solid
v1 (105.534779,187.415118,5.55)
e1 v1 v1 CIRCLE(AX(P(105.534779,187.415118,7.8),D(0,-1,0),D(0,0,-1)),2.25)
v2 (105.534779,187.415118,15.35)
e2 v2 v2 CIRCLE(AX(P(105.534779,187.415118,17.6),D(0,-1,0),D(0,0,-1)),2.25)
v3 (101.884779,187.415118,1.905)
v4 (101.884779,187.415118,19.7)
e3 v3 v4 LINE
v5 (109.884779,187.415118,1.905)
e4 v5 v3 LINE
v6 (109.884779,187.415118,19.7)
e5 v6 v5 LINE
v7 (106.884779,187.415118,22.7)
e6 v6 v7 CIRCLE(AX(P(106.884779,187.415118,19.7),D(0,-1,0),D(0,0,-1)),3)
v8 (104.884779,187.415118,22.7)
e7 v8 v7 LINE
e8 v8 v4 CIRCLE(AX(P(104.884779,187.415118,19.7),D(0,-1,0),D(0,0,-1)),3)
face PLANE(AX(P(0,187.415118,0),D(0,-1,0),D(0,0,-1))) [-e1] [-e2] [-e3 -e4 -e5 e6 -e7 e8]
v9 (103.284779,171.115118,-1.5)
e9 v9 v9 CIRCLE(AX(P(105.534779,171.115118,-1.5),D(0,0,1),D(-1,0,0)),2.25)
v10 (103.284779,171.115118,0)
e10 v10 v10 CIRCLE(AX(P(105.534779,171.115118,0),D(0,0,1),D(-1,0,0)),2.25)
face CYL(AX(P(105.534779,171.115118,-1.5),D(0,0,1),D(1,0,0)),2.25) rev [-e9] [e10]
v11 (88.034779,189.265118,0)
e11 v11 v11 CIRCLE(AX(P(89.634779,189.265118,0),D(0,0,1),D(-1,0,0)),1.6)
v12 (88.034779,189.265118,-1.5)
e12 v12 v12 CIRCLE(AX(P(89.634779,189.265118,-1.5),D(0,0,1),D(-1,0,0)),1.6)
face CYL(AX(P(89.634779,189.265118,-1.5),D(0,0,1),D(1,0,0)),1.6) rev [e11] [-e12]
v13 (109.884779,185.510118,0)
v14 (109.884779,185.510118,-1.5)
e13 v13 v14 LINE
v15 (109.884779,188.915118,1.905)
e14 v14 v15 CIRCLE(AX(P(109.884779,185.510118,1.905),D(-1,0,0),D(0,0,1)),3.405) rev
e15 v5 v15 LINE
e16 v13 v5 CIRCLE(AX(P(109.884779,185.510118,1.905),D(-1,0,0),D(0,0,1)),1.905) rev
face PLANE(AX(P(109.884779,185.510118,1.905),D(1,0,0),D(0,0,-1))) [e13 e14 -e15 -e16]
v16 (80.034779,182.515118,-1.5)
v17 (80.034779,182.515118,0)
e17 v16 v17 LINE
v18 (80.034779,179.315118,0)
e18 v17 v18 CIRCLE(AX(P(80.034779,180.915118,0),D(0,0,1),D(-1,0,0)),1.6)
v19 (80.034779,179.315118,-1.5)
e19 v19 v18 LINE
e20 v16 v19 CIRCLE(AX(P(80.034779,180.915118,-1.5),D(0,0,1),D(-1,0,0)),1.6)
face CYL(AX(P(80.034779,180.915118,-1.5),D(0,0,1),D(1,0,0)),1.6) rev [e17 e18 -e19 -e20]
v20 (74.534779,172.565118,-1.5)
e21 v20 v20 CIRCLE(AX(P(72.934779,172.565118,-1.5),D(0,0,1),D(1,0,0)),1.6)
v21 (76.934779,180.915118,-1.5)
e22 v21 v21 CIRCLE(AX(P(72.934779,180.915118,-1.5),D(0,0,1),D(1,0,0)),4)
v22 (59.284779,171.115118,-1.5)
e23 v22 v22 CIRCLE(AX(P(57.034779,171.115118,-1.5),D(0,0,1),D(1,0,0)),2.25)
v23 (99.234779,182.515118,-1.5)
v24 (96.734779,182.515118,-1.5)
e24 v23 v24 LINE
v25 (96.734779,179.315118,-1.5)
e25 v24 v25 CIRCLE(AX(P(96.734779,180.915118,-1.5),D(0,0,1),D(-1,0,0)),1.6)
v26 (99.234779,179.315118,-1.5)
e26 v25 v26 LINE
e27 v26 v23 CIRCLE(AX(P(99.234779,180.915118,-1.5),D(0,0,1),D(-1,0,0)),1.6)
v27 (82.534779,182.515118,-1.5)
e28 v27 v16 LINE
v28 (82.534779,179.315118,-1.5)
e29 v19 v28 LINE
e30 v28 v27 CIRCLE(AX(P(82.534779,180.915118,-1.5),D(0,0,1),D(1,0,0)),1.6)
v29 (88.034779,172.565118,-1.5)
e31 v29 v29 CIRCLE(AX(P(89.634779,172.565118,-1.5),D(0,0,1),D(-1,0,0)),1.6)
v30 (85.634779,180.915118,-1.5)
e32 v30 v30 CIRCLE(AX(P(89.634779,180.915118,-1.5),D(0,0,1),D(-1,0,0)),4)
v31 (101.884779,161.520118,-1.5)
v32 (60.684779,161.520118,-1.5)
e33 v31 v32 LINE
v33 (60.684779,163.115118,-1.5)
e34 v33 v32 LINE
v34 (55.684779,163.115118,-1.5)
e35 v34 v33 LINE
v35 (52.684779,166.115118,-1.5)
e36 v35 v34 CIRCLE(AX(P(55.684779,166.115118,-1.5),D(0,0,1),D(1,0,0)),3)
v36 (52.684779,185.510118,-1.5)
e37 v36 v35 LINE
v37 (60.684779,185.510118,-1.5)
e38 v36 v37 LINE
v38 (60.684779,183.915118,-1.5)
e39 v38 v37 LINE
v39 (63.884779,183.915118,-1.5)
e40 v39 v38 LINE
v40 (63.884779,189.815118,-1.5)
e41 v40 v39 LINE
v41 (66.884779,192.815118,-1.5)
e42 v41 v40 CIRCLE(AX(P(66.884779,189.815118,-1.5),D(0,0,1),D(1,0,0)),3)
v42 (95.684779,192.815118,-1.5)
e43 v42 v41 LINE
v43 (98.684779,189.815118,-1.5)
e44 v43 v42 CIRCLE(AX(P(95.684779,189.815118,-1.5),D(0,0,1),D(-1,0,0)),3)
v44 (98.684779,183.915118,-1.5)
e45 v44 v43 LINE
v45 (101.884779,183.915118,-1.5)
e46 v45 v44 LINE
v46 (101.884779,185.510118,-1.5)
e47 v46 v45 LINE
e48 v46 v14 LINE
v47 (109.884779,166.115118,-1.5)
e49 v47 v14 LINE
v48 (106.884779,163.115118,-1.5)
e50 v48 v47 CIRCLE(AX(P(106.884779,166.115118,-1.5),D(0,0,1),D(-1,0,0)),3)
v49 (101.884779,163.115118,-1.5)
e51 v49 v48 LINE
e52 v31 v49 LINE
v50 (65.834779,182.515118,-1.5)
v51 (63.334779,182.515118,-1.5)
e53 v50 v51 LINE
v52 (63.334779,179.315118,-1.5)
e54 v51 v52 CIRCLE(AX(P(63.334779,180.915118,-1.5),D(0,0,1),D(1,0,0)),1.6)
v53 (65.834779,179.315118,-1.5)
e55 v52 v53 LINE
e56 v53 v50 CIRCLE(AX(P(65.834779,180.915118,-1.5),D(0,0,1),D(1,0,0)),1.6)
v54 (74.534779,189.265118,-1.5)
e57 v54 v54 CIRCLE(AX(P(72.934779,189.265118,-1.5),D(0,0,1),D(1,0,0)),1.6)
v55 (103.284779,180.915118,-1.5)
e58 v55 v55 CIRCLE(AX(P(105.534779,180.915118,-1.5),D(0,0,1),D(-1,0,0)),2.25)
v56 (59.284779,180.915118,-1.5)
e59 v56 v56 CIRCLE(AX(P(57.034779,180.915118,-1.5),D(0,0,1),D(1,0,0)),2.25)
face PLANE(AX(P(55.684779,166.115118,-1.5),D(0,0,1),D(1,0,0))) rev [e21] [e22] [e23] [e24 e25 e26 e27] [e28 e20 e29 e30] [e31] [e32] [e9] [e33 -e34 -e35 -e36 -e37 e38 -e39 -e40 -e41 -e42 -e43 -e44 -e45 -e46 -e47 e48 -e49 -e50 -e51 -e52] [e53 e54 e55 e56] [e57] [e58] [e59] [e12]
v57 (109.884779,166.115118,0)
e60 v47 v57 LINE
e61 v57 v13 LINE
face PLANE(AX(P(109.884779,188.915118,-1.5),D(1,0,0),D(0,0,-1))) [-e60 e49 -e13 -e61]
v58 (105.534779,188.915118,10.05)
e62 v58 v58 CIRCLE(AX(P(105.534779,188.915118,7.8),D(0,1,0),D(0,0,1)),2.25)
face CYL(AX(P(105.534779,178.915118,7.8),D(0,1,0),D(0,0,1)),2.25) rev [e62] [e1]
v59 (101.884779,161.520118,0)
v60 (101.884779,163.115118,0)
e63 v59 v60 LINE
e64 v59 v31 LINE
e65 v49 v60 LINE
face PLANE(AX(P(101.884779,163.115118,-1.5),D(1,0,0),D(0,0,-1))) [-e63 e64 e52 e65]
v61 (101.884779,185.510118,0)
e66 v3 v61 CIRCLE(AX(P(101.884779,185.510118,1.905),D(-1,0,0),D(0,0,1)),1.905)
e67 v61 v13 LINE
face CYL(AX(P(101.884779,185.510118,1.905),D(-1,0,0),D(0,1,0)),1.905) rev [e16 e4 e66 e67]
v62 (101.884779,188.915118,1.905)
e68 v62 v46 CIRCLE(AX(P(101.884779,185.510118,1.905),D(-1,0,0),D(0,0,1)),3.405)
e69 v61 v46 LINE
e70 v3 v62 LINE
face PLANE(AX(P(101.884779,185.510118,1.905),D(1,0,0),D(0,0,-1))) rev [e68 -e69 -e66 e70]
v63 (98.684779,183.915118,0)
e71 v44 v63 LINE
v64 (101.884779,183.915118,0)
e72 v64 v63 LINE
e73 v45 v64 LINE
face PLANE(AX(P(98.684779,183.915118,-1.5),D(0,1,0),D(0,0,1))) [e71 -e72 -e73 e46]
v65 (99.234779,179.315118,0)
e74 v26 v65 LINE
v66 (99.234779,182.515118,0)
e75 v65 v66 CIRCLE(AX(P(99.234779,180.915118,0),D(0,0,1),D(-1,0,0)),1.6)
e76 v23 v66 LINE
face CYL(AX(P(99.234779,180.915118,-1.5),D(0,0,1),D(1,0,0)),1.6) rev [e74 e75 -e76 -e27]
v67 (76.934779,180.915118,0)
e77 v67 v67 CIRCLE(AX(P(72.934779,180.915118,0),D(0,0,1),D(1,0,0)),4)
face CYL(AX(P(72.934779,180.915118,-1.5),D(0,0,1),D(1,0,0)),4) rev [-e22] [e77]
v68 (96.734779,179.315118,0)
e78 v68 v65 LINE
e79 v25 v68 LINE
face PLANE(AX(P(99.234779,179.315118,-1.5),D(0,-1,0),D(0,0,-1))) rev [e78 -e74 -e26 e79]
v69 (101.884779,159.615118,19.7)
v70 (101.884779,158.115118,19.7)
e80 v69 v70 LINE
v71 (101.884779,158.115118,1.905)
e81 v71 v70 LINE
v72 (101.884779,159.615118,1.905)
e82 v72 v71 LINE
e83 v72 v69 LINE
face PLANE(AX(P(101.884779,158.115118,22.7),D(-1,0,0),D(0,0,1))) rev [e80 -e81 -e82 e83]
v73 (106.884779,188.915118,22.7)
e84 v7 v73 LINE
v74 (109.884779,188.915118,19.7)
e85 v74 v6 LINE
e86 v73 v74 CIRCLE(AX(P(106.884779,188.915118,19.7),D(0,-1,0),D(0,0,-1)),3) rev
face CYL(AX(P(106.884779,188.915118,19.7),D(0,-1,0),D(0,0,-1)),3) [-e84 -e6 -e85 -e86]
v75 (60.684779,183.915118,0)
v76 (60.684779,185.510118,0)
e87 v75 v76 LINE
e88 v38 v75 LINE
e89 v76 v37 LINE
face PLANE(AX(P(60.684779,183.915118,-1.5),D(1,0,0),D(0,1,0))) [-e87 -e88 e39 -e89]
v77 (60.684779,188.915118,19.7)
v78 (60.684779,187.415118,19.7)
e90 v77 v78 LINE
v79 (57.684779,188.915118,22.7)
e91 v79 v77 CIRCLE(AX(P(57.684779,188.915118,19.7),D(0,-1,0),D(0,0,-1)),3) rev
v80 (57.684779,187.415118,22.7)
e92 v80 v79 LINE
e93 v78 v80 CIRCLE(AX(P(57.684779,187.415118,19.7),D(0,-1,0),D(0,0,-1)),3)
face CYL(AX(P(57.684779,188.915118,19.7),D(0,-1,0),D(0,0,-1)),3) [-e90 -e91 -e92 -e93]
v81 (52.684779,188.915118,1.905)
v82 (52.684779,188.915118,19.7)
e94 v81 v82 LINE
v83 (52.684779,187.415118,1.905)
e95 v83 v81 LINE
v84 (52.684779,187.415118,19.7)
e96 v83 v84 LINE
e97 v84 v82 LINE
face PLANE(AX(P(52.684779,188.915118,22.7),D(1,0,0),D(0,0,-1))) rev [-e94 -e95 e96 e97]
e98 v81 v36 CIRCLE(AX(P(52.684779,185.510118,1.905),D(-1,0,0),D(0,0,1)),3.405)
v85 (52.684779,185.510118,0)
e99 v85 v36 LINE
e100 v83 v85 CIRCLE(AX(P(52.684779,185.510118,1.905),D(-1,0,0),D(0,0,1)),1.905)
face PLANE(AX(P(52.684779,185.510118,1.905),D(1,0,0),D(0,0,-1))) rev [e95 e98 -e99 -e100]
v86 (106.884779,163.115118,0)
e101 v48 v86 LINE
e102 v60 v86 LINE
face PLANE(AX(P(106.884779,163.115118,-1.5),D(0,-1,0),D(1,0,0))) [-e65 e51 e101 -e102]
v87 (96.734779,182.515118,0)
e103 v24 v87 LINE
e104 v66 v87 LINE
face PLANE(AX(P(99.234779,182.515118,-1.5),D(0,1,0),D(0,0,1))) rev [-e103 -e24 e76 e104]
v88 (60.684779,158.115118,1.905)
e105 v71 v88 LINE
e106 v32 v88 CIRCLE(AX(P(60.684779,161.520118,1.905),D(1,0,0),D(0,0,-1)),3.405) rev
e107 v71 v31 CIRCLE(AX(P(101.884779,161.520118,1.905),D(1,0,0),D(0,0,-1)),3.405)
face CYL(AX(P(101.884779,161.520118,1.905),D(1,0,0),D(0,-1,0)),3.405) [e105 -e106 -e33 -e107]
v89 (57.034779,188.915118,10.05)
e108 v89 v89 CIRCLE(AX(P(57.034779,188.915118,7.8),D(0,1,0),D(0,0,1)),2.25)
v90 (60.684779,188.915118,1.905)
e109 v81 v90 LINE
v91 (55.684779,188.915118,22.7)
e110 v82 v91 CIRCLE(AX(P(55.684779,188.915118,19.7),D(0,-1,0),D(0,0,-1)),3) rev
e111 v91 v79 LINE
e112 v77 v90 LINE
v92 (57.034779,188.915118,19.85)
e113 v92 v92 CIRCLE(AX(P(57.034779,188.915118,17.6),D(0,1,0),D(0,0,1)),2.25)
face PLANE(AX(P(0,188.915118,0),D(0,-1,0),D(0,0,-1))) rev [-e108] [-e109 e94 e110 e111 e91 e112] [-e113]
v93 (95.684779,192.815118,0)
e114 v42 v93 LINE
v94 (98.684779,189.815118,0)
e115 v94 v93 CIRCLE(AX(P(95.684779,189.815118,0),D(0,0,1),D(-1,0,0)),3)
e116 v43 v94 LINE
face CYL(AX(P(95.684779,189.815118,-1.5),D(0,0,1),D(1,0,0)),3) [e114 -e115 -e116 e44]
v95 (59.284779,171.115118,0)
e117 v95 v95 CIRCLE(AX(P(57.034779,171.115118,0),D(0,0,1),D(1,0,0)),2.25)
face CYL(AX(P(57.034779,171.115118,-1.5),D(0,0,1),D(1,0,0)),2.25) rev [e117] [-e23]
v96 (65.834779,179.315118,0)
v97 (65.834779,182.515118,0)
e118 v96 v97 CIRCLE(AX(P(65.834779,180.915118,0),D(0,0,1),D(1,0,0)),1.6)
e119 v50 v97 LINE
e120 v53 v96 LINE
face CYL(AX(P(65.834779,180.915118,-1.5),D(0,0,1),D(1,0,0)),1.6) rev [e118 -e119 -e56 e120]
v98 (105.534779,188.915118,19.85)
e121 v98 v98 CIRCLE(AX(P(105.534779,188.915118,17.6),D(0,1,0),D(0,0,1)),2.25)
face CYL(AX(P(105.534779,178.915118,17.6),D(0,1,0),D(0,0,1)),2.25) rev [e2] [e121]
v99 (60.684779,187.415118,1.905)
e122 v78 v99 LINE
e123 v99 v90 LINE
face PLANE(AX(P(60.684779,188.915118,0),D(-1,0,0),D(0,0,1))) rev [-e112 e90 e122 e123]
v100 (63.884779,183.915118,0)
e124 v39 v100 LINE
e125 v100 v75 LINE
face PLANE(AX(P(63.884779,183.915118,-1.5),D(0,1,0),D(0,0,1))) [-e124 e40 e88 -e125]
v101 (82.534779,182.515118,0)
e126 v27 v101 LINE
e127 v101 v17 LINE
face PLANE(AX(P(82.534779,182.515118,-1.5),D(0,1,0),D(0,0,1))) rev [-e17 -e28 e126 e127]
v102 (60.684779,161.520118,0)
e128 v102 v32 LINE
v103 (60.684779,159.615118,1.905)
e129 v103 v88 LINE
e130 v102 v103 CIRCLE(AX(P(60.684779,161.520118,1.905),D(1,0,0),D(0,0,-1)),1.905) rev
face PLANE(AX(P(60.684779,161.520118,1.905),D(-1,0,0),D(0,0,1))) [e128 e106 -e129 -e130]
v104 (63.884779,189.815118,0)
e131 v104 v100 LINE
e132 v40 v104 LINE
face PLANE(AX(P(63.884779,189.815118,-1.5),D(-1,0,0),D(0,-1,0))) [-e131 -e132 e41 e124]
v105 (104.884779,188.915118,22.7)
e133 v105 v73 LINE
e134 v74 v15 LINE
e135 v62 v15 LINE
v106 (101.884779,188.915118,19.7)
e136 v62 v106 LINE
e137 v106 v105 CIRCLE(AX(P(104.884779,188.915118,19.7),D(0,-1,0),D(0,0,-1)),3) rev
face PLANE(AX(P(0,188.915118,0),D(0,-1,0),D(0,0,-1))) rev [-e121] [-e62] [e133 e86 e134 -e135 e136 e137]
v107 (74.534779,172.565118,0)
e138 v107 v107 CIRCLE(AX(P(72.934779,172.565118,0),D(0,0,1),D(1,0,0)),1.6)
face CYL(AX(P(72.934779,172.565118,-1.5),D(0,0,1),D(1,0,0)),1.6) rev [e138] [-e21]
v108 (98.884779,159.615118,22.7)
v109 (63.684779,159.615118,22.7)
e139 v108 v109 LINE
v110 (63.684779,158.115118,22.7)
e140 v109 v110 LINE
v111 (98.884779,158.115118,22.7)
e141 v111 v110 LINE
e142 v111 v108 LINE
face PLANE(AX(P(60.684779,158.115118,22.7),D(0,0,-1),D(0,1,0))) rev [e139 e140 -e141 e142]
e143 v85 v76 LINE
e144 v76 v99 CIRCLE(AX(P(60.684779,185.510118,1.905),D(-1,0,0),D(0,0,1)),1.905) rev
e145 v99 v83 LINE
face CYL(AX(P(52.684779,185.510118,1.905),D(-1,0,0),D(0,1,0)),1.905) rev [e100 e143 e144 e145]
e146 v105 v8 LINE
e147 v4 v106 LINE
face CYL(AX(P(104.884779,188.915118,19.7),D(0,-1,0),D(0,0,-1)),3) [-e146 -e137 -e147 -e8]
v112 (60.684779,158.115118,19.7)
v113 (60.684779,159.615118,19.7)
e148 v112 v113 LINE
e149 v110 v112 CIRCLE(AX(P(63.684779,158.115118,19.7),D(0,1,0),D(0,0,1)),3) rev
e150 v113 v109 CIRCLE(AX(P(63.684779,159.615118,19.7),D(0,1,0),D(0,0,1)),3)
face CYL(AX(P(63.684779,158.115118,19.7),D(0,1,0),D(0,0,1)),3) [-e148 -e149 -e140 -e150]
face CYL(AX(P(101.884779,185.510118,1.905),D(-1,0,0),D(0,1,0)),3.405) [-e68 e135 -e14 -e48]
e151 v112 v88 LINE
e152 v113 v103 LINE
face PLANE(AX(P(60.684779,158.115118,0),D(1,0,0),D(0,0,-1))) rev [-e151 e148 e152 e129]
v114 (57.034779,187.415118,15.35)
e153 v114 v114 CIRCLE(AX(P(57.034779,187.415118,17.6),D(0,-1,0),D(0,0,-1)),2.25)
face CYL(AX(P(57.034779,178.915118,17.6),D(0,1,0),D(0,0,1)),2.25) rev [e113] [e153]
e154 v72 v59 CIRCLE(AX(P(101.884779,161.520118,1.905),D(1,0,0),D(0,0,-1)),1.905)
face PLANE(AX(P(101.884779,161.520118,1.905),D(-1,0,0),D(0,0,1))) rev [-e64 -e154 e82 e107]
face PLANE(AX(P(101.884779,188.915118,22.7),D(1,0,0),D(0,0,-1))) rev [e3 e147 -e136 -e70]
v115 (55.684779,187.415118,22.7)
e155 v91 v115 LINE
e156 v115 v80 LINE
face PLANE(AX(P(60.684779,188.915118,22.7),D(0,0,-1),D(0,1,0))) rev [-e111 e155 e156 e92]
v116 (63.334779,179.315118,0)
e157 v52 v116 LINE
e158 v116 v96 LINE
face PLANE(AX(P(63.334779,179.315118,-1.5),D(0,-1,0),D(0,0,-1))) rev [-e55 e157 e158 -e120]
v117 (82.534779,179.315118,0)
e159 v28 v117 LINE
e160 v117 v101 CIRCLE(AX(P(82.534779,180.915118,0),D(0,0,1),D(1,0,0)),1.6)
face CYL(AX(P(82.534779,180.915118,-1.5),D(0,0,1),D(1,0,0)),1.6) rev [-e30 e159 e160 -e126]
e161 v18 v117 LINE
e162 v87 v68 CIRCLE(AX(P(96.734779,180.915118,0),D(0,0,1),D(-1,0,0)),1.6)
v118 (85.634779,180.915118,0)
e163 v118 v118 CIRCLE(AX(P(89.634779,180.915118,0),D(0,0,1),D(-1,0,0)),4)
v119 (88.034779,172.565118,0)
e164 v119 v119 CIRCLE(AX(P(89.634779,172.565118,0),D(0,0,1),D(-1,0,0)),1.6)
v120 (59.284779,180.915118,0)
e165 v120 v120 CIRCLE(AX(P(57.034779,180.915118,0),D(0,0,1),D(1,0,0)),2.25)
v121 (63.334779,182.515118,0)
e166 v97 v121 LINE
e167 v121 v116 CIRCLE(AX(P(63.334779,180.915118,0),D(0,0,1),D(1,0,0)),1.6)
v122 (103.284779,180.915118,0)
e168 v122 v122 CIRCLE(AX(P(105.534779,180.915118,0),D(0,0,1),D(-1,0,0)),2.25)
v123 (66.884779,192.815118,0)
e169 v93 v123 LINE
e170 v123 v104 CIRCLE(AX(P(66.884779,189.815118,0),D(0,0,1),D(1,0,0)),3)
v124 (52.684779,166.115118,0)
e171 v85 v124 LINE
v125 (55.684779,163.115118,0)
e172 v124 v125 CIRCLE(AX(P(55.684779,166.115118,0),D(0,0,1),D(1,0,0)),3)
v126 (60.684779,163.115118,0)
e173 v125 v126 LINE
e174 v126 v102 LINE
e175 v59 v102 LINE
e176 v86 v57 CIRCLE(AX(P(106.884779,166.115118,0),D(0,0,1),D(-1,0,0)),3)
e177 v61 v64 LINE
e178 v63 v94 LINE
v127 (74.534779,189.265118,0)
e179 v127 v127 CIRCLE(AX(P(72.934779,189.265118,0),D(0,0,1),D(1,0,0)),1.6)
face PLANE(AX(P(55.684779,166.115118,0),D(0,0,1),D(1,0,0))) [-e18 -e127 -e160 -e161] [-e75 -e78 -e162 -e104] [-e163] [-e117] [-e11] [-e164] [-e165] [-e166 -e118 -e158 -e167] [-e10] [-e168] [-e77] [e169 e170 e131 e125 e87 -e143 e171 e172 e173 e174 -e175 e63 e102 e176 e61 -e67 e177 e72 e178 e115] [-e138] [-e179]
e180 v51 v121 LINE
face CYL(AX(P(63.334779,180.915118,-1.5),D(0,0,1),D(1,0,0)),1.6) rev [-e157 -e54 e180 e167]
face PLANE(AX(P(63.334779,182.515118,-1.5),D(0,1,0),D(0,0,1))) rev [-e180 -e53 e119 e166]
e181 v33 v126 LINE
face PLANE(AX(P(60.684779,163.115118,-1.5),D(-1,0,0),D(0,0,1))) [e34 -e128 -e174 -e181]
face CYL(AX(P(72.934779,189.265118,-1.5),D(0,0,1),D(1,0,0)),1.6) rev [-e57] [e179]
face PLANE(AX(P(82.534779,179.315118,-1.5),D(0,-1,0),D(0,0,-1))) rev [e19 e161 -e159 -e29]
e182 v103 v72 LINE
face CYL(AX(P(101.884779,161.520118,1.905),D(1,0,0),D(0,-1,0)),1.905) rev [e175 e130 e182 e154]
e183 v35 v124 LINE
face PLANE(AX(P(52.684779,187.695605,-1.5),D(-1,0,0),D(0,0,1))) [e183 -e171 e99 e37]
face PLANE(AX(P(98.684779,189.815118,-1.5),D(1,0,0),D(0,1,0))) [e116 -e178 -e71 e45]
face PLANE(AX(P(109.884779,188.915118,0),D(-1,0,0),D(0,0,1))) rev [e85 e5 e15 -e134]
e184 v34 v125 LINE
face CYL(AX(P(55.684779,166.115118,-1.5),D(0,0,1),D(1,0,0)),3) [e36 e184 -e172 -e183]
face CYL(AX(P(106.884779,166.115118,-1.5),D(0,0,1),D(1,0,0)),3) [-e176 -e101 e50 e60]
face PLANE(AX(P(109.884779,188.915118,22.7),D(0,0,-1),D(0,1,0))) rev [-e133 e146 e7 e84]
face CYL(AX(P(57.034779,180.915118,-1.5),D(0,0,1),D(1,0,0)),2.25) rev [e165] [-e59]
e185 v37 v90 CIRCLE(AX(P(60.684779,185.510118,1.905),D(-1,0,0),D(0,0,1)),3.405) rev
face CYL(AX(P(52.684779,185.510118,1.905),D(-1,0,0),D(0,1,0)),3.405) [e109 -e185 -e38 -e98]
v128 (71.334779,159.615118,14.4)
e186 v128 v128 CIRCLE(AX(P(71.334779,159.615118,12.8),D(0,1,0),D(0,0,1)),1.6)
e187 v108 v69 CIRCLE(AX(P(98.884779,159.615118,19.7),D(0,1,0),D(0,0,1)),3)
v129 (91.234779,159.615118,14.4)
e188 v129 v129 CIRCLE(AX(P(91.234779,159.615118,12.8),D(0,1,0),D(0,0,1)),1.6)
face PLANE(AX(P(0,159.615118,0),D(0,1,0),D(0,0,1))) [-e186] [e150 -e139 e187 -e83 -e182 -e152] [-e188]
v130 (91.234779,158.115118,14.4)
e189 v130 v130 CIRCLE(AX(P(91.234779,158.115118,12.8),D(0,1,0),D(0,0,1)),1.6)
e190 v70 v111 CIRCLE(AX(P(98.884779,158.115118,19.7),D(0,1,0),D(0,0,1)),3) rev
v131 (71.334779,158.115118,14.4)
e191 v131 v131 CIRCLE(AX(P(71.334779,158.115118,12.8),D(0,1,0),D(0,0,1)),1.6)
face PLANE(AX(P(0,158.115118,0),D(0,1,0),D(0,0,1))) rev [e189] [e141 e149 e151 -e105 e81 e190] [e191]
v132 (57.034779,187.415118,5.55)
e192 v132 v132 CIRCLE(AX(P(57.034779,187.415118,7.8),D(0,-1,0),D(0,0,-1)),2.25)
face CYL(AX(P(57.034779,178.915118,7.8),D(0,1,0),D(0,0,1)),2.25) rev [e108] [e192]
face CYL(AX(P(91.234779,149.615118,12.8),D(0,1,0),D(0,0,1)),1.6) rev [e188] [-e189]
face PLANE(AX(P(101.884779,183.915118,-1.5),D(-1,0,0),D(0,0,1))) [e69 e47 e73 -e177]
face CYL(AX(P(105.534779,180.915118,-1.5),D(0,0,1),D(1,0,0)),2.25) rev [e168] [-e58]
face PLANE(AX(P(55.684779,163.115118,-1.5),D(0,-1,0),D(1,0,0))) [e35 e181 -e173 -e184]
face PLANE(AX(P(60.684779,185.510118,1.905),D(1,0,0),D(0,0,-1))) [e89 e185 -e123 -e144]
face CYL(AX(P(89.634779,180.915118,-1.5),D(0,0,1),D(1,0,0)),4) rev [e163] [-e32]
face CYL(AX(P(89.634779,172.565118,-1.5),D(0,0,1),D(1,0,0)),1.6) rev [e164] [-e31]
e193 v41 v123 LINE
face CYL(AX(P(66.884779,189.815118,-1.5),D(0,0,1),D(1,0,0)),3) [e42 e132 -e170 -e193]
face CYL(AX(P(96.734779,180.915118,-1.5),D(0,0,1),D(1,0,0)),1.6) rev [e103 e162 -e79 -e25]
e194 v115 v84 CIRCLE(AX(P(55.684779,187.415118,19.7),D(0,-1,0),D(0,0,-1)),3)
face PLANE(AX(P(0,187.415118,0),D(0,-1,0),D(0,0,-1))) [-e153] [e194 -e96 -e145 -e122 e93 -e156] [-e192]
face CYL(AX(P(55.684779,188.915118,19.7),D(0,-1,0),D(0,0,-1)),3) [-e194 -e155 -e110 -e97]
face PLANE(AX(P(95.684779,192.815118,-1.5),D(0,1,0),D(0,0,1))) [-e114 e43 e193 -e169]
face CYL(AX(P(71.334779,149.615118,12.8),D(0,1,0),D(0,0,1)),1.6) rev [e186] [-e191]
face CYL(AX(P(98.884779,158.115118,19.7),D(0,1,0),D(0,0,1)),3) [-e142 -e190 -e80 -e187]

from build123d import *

# Parameters (mm, degrees)
ESQUISSE1_R                           = 2.25
ESQUISSE1_R_2                         = 4
ESQUISSE1_R_3                         = 1.6
T_LE_DE_BASE_PLI_E1_DEPTH             = 1.5
T_LE_PLI_E_SUR_AR_TE1_STRIP_W         = 9.81
T_LE_PLI_E_SUR_AR_TE1_STRIP_H         = 1.5
T_LE_PLI_E_SUR_AR_TE1_STRIP_CUT_DEPTH = 41.2
T_LE_PLI_E_SUR_AR_TE1_DEPTH           = 41.2
CONG_1_R                              = 3
ESQUISSE9_R                           = 1.6
ENL_V_MAT_EXTRU_1_DEPTH               = 10
T_LE_PLI_E_SUR_AR_TE2_STRIP_W         = 9.81
T_LE_PLI_E_SUR_AR_TE2_STRIP_H         = 1.5
T_LE_PLI_E_SUR_AR_TE2_STRIP_CUT_DEPTH = 8
T_LE_PLI_E_SUR_AR_TE2_DEPTH           = 8
T_LE_PLI_E_SUR_AR_TE3_STRIP_W         = 9.81
T_LE_PLI_E_SUR_AR_TE3_STRIP_H         = 1.5
T_LE_PLI_E_SUR_AR_TE3_STRIP_CUT_DEPTH = 8
T_LE_PLI_E_SUR_AR_TE3_DEPTH           = 8
CONG_2_R                              = 3
ESQUISSE16_R                          = 2.25
ENL_V_MAT_EXTRU_2_DEPTH               = 10


# Sheet-metal steps are written as plain solids
with BuildPart() as part:
    # Esquisse1 → Tôle de base pliée1 (new body)
    with BuildSketch(Plane.XY):
        with BuildLine():
            Line((52.684779063, 187.695605254), (52.684779063, 166.115117635))
            ThreePointArc((52.684779063, 166.115117635), (53.563458719, 163.993797291), (55.684779063, 163.115117635))
            Line((55.684779063, 163.115117635), (60.684779063, 163.115117635))
            Line((60.684779063, 163.115117635), (60.684779063, 158.115117635))
            Line((60.684779063, 158.115117635), (101.884779063, 158.115117635))
            Line((101.884779063, 158.115117635), (101.884779063, 163.115117635))
            Line((101.884779063, 163.115117635), (106.884779063, 163.115117635))
            ThreePointArc((106.884779063, 163.115117635), (109.006099406, 163.993797291), (109.884779063, 166.115117635))
            Line((109.884779063, 166.115117635), (109.884779063, 187.695605254))
            Line((109.884779063, 187.695605254), (109.884779063, 188.915117635))
            Line((109.884779063, 188.915117635), (101.884779063, 188.915117635))
            Line((101.884779063, 188.915117635), (101.884779063, 183.915117635))
            Line((101.884779063, 183.915117635), (98.684779063, 183.915117635))
            Line((98.684779063, 183.915117635), (98.684779063, 189.815117635))
            ThreePointArc((98.684779063, 189.815117635), (97.806099406, 191.936437979), (95.684779063, 192.815117635))
            Line((95.684779063, 192.815117635), (66.884779063, 192.815117635))
            ThreePointArc((66.884779063, 192.815117635), (64.763458719, 191.936437979), (63.884779063, 189.815117635))
            Line((63.884779063, 189.815117635), (63.884779063, 183.915117635))
            Line((63.884779063, 183.915117635), (60.684779063, 183.915117635))
            Line((60.684779063, 183.915117635), (60.684779063, 188.915117635))
            Line((60.684779063, 188.915117635), (52.684779063, 188.915117635))
            Line((52.684779063, 188.915117635), (52.684779063, 187.695605254))
        make_face()
        with Locations((57.034779063, 180.915117635)):
            Circle(ESQUISSE1_R, mode=Mode.SUBTRACT)
        with Locations((57.034779063, 171.115117635)):
            Circle(ESQUISSE1_R, mode=Mode.SUBTRACT)
        with Locations((72.934779063, 180.915117635)):
            Circle(ESQUISSE1_R_2, mode=Mode.SUBTRACT)
        with Locations((72.934779063, 189.265117635)):
            Circle(ESQUISSE1_R_3, mode=Mode.SUBTRACT)
        with Locations((72.934779063, 172.565117635)):
            Circle(ESQUISSE1_R_3, mode=Mode.SUBTRACT)
        with Locations(Location((89.634779063, 172.565117635, 0), (0, 0, 180))):
            Circle(ESQUISSE1_R_3, mode=Mode.SUBTRACT)
        with Locations(Location((89.634779063, 189.265117635, 0), (0, 0, 180))):
            Circle(ESQUISSE1_R_3, mode=Mode.SUBTRACT)
        with Locations(Location((89.634779063, 180.915117635, 0), (0, 0, 180))):
            Circle(ESQUISSE1_R_2, mode=Mode.SUBTRACT)
        with Locations(Location((105.534779063, 171.115117635, 0), (0, 0, 180))):
            Circle(ESQUISSE1_R, mode=Mode.SUBTRACT)
        with Locations(Location((105.534779063, 180.915117635, 0), (0, 0, 180))):
            Circle(ESQUISSE1_R, mode=Mode.SUBTRACT)
        with BuildLine():
            Line((63.334779063, 182.515117635), (65.834779063, 182.515117635))
            ThreePointArc((65.834779063, 182.515117635), (67.434779063, 180.915117635), (65.834779063, 179.315117635))
            Line((65.834779063, 179.315117635), (63.334779063, 179.315117635))
            ThreePointArc((63.334779063, 179.315117635), (61.734779063, 180.915117635), (63.334779063, 182.515117635))
        make_face(mode=Mode.SUBTRACT)
        with BuildLine():
            Line((82.534779063, 182.515117635), (80.034779063, 182.515117635))
            ThreePointArc((80.034779063, 182.515117635), (78.434779063, 180.915117635), (80.034779063, 179.315117635))
            Line((80.034779063, 179.315117635), (82.534779063, 179.315117635))
            ThreePointArc((82.534779063, 179.315117635), (84.134779063, 180.915117635), (82.534779063, 182.515117635))
        make_face(mode=Mode.SUBTRACT)
        with BuildLine():
            Line((99.234779063, 182.515117635), (96.734779063, 182.515117635))
            ThreePointArc((96.734779063, 182.515117635), (95.134779063, 180.915117635), (96.734779063, 179.315117635))
            Line((96.734779063, 179.315117635), (99.234779063, 179.315117635))
            ThreePointArc((99.234779063, 179.315117635), (100.834779063, 180.915117635), (99.234779063, 182.515117635))
        make_face(mode=Mode.SUBTRACT)
    extrude(amount=-T_LE_DE_BASE_PLI_E1_DEPTH)

    # Tôle pliée sur arête1 strip (across the edge) → Tôle pliée sur arête1 strip cut (cut)
    with BuildSketch(Plane(origin=(60.684779063, 158.115117635, 0), x_dir=(0, 1, 0), z_dir=(1, 0, 0))):
        with Locations((-1.5, -0.75)):
            Rectangle(T_LE_PLI_E_SUR_AR_TE1_STRIP_W, T_LE_PLI_E_SUR_AR_TE1_STRIP_H)
    extrude(amount=T_LE_PLI_E_SUR_AR_TE1_STRIP_CUT_DEPTH, mode=Mode.SUBTRACT)

    # Tôle pliée sur arête1 section (across the edge) → Tôle pliée sur arête1 (add)
    with BuildSketch(Plane(origin=(60.684779063, 158.115117635, 0), x_dir=(0, 1, 0), z_dir=(1, 0, 0))):
        with BuildLine():
            Line((0, 1.905), (0, 22.7))
            Line((0, 22.7), (1.5, 22.7))
            Line((1.5, 22.7), (1.5, 1.905))
            ThreePointArc((1.5, 1.905), (2.057961582, 0.557961582), (3.405, 0))
            Line((3.405, 0), (3.405, -1.5))
            ThreePointArc((3.405, -1.5), (0.99730141, -0.50269859), (0, 1.905))
        make_face()
    extrude(amount=T_LE_PLI_E_SUR_AR_TE1_DEPTH)

    # Congé1
    cong_1_edges = [part.edges().sort_by_distance(p)[0] for p in [
        (60.684779063, 158.865117635, 22.7),
        (101.884779063, 158.865117635, 22.7),
    ]]
    fillet(cong_1_edges, radius=CONG_1_R)

    # Esquisse9 → Enlèv. mat.-Extru.1 (cut)
    with BuildSketch(Plane(origin=(0, 159.615117635, 0), x_dir=(1, 0, 0), z_dir=(0, 1, 0))):
        with Locations(Location((71.334779063, -12.8, 0), (0, 0, 270))):
            Circle(ESQUISSE9_R)
        with Locations(Location((91.234779063, -12.8, 0), (0, 0, 270))):
            Circle(ESQUISSE9_R)
    extrude(amount=-ENL_V_MAT_EXTRU_1_DEPTH, mode=Mode.SUBTRACT)

    # Tôle pliée sur arête2 strip (across the edge) → Tôle pliée sur arête2 strip cut (cut)
    with BuildSketch(Plane(origin=(60.684779063, 188.915117635, 0), x_dir=(0, -1, 0), z_dir=(-1, 0, 0))):
        with Locations((-1.5, -0.75)):
            Rectangle(T_LE_PLI_E_SUR_AR_TE2_STRIP_W, T_LE_PLI_E_SUR_AR_TE2_STRIP_H)
    extrude(amount=T_LE_PLI_E_SUR_AR_TE2_STRIP_CUT_DEPTH, mode=Mode.SUBTRACT)

    # Tôle pliée sur arête2 section (across the edge) → Tôle pliée sur arête2 (add)
    with BuildSketch(Plane(origin=(60.684779063, 188.915117635, 0), x_dir=(0, -1, 0), z_dir=(-1, 0, 0))):
        with BuildLine():
            Line((0, 1.905), (0, 22.7))
            Line((0, 22.7), (1.5, 22.7))
            Line((1.5, 22.7), (1.5, 1.905))
            ThreePointArc((1.5, 1.905), (2.057961582, 0.557961582), (3.405, 0))
            Line((3.405, 0), (3.405, -1.5))
            ThreePointArc((3.405, -1.5), (0.99730141, -0.50269859), (0, 1.905))
        make_face()
    extrude(amount=T_LE_PLI_E_SUR_AR_TE2_DEPTH)

    # Tôle pliée sur arête3 strip (across the edge) → Tôle pliée sur arête3 strip cut (cut)
    with BuildSketch(Plane(origin=(109.884779063, 188.915117635, 0), x_dir=(0, -1, 0), z_dir=(-1, 0, 0))):
        with Locations((-1.5, -0.75)):
            Rectangle(T_LE_PLI_E_SUR_AR_TE3_STRIP_W, T_LE_PLI_E_SUR_AR_TE3_STRIP_H)
    extrude(amount=T_LE_PLI_E_SUR_AR_TE3_STRIP_CUT_DEPTH, mode=Mode.SUBTRACT)

    # Tôle pliée sur arête3 section (across the edge) → Tôle pliée sur arête3 (add)
    with BuildSketch(Plane(origin=(109.884779063, 188.915117635, 0), x_dir=(0, -1, 0), z_dir=(-1, 0, 0))):
        with BuildLine():
            Line((0, 1.905), (0, 22.7))
            Line((0, 22.7), (1.5, 22.7))
            Line((1.5, 22.7), (1.5, 1.905))
            ThreePointArc((1.5, 1.905), (2.057961582, 0.557961582), (3.405, 0))
            Line((3.405, 0), (3.405, -1.5))
            ThreePointArc((3.405, -1.5), (0.99730141, -0.50269859), (0, 1.905))
        make_face()
    extrude(amount=T_LE_PLI_E_SUR_AR_TE3_DEPTH)

    # Congé2
    cong_2_edges = [part.edges().sort_by_distance(p)[0] for p in [
        (60.684779063, 188.165117635, 22.7),
        (52.684779063, 188.165117635, 22.7),
        (109.884779063, 188.165117635, 22.7),
        (101.884779063, 188.165117635, 22.7),
    ]]
    fillet(cong_2_edges, radius=CONG_2_R)

    # Esquisse16 → Enlèv. mat.-Extru.2 (cut)
    with BuildSketch(Plane(origin=(0, 188.915117635, 0), x_dir=(1, 0, 0), z_dir=(0, 1, 0))):
        with Locations(Location((57.034779063, -7.8, 0), (0, 0, 270))):
            Circle(ESQUISSE16_R)
        with Locations(Location((57.034779063, -17.6, 0), (0, 0, 270))):
            Circle(ESQUISSE16_R)
        with Locations(Location((105.534779063, -7.8, 0), (0, 0, 270))):
            Circle(ESQUISSE16_R)
        with Locations(Location((105.534779063, -17.6, 0), (0, 0, 270))):
            Circle(ESQUISSE16_R)
    extrude(amount=-ENL_V_MAT_EXTRU_2_DEPTH, mode=Mode.SUBTRACT)


solid = part.part
